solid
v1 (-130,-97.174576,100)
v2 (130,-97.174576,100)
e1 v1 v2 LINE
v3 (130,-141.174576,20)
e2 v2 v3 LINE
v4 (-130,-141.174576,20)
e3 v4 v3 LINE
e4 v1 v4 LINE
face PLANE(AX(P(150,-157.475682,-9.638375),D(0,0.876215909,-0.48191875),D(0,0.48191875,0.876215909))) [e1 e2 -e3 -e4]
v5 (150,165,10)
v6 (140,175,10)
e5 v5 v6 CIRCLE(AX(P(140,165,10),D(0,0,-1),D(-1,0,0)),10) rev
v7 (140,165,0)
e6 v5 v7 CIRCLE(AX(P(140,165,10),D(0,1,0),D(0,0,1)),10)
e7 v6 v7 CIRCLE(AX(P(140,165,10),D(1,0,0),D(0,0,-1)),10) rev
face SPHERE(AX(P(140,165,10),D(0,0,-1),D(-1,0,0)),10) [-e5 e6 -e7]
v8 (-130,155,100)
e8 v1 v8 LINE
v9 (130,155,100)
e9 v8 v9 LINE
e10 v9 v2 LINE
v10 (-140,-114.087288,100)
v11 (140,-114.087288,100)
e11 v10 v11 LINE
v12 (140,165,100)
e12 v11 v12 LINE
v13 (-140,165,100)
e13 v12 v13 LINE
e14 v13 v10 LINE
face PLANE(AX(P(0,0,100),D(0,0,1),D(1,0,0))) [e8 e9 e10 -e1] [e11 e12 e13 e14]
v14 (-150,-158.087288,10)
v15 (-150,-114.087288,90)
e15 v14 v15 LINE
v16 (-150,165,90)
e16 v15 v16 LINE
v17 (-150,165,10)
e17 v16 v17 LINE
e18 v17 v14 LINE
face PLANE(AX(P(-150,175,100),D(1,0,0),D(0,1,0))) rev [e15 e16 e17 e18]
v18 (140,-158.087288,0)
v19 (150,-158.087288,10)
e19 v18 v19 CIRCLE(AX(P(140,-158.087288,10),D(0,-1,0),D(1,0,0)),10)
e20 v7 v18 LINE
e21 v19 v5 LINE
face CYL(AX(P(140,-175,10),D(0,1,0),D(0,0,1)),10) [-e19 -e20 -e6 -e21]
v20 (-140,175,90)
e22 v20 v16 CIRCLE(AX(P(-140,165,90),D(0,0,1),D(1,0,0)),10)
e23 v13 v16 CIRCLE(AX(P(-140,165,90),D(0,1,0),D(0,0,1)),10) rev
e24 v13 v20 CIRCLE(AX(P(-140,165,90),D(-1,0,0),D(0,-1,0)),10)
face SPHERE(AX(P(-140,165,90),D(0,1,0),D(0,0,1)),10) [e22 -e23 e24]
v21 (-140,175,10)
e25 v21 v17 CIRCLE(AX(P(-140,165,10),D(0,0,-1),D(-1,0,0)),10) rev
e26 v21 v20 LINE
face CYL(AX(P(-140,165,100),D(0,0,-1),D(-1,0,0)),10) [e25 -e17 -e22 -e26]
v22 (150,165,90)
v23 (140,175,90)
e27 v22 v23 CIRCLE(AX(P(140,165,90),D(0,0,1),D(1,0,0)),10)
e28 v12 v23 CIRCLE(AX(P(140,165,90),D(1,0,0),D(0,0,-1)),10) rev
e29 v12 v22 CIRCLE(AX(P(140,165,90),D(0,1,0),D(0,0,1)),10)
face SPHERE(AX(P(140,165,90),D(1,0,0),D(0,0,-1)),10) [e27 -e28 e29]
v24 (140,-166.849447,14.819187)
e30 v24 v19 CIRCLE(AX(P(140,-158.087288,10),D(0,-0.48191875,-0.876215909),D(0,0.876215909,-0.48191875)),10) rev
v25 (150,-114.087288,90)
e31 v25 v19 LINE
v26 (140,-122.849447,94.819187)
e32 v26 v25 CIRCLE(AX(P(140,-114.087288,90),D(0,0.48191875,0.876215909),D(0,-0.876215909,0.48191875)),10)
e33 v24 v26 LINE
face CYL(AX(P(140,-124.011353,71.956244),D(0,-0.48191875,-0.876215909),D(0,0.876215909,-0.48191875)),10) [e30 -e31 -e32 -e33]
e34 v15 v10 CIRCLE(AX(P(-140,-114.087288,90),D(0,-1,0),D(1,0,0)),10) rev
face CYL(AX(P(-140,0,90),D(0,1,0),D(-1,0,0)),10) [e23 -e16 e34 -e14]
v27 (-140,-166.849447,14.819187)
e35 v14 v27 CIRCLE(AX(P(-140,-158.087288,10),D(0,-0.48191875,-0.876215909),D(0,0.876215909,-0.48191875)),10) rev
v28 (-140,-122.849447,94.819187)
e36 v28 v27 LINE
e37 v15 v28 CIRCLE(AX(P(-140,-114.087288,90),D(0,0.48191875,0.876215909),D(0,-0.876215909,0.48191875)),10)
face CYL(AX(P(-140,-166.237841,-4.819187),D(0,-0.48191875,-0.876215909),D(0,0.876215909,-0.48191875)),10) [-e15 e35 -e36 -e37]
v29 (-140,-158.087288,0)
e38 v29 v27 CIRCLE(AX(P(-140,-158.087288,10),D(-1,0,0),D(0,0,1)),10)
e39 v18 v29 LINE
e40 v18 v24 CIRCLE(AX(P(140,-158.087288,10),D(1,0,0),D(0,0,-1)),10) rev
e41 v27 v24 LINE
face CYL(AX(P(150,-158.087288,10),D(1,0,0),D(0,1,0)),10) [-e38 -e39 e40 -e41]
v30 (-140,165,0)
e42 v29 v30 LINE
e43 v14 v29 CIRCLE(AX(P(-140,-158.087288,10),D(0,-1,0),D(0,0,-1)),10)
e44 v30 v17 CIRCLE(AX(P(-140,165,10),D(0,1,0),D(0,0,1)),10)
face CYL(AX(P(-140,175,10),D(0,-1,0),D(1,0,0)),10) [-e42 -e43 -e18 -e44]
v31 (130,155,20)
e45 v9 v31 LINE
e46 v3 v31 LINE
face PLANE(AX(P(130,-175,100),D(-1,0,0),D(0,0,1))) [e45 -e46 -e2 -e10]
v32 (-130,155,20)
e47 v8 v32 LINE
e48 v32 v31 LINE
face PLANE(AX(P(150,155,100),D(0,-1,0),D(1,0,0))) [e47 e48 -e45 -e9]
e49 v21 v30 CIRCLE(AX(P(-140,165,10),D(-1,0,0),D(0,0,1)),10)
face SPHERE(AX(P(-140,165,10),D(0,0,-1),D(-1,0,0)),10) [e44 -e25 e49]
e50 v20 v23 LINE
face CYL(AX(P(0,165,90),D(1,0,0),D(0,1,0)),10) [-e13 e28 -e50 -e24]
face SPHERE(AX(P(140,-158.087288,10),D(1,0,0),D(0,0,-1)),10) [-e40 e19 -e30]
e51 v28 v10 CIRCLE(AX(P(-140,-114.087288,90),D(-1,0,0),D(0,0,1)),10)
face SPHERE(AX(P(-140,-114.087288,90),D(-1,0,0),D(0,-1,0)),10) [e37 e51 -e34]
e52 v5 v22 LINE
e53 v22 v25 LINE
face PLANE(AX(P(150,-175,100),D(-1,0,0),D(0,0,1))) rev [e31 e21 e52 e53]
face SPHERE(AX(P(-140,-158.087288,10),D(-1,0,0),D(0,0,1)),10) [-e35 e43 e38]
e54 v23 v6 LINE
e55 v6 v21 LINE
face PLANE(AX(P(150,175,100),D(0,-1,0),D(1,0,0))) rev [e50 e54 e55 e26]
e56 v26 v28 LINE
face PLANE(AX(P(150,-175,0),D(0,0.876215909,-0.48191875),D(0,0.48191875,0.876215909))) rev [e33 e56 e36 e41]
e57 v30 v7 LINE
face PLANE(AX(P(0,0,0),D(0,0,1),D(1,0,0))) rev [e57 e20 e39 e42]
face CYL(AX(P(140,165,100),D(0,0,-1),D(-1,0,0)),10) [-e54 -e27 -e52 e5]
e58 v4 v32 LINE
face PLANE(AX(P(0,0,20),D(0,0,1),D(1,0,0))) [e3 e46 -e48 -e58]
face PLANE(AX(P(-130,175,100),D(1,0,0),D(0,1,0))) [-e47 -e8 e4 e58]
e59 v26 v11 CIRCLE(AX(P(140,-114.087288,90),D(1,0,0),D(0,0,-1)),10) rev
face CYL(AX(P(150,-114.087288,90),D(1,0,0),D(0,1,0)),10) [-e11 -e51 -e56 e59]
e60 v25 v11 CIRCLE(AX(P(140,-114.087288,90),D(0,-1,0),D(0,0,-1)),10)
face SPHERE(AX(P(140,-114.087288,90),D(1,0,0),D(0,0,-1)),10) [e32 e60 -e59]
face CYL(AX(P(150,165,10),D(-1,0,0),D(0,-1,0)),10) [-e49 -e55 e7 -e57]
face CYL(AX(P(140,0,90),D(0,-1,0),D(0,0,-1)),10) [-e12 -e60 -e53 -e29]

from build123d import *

# Parameters (mm, degrees)
SKETCH1_W           = 300
SKETCH1_H           = 350
BOSS_EXTRUDE1_DEPTH = 100
CUT_EXTRUDE1_DEPTH  = 362.42080737
FILLET1_R           = 10
SHELL1_START        = -130
SHELL1_DEPTH        = 260


# Read off the part's stored shape, not the designer's step: Shell1
with BuildPart() as part:
    # Sketch1 → Boss-Extrude1 (new body)
    with BuildSketch(Plane.XY):
        Rectangle(SKETCH1_W, SKETCH1_H)
    extrude(amount=BOSS_EXTRUDE1_DEPTH)

    # Sketch2 → Cut-Extrude1 (cut, through all)
    with BuildSketch(Plane.ZY.offset(150)):
        Polygon((0, -175), (100, -120), (100, -175), align=None)
    extrude(amount=-CUT_EXTRUDE1_DEPTH, mode=Mode.SUBTRACT)

    # Fillet1
    fillet1_edges = [part.edges().sort_by_distance(p)[0] for p in [
        (150, 27.5, 100),
        (150, -147.5, 50),
        (0, -120, 100),
        (-150, -147.5, 50),
        (0, 175, 100),
        (150, 0, 0),
        (0, -175, 0),
        (-150, 0, 0),
        (0, 175, 0),
        (150, 175, 50),
        (-150, 175, 50),
        (-150, 27.5, 100),
    ]]
    fillet(fillet1_edges, radius=FILLET1_R)

    # Shell1 outline → Shell1 (cut)
    with BuildSketch(Plane.YZ.offset(SHELL1_START)):
        Polygon((155, 20), (155, 100), (-97.174575579, 100), (-141.174575579, 20), align=None)
    extrude(amount=SHELL1_DEPTH, mode=Mode.SUBTRACT)


solid = part.part
